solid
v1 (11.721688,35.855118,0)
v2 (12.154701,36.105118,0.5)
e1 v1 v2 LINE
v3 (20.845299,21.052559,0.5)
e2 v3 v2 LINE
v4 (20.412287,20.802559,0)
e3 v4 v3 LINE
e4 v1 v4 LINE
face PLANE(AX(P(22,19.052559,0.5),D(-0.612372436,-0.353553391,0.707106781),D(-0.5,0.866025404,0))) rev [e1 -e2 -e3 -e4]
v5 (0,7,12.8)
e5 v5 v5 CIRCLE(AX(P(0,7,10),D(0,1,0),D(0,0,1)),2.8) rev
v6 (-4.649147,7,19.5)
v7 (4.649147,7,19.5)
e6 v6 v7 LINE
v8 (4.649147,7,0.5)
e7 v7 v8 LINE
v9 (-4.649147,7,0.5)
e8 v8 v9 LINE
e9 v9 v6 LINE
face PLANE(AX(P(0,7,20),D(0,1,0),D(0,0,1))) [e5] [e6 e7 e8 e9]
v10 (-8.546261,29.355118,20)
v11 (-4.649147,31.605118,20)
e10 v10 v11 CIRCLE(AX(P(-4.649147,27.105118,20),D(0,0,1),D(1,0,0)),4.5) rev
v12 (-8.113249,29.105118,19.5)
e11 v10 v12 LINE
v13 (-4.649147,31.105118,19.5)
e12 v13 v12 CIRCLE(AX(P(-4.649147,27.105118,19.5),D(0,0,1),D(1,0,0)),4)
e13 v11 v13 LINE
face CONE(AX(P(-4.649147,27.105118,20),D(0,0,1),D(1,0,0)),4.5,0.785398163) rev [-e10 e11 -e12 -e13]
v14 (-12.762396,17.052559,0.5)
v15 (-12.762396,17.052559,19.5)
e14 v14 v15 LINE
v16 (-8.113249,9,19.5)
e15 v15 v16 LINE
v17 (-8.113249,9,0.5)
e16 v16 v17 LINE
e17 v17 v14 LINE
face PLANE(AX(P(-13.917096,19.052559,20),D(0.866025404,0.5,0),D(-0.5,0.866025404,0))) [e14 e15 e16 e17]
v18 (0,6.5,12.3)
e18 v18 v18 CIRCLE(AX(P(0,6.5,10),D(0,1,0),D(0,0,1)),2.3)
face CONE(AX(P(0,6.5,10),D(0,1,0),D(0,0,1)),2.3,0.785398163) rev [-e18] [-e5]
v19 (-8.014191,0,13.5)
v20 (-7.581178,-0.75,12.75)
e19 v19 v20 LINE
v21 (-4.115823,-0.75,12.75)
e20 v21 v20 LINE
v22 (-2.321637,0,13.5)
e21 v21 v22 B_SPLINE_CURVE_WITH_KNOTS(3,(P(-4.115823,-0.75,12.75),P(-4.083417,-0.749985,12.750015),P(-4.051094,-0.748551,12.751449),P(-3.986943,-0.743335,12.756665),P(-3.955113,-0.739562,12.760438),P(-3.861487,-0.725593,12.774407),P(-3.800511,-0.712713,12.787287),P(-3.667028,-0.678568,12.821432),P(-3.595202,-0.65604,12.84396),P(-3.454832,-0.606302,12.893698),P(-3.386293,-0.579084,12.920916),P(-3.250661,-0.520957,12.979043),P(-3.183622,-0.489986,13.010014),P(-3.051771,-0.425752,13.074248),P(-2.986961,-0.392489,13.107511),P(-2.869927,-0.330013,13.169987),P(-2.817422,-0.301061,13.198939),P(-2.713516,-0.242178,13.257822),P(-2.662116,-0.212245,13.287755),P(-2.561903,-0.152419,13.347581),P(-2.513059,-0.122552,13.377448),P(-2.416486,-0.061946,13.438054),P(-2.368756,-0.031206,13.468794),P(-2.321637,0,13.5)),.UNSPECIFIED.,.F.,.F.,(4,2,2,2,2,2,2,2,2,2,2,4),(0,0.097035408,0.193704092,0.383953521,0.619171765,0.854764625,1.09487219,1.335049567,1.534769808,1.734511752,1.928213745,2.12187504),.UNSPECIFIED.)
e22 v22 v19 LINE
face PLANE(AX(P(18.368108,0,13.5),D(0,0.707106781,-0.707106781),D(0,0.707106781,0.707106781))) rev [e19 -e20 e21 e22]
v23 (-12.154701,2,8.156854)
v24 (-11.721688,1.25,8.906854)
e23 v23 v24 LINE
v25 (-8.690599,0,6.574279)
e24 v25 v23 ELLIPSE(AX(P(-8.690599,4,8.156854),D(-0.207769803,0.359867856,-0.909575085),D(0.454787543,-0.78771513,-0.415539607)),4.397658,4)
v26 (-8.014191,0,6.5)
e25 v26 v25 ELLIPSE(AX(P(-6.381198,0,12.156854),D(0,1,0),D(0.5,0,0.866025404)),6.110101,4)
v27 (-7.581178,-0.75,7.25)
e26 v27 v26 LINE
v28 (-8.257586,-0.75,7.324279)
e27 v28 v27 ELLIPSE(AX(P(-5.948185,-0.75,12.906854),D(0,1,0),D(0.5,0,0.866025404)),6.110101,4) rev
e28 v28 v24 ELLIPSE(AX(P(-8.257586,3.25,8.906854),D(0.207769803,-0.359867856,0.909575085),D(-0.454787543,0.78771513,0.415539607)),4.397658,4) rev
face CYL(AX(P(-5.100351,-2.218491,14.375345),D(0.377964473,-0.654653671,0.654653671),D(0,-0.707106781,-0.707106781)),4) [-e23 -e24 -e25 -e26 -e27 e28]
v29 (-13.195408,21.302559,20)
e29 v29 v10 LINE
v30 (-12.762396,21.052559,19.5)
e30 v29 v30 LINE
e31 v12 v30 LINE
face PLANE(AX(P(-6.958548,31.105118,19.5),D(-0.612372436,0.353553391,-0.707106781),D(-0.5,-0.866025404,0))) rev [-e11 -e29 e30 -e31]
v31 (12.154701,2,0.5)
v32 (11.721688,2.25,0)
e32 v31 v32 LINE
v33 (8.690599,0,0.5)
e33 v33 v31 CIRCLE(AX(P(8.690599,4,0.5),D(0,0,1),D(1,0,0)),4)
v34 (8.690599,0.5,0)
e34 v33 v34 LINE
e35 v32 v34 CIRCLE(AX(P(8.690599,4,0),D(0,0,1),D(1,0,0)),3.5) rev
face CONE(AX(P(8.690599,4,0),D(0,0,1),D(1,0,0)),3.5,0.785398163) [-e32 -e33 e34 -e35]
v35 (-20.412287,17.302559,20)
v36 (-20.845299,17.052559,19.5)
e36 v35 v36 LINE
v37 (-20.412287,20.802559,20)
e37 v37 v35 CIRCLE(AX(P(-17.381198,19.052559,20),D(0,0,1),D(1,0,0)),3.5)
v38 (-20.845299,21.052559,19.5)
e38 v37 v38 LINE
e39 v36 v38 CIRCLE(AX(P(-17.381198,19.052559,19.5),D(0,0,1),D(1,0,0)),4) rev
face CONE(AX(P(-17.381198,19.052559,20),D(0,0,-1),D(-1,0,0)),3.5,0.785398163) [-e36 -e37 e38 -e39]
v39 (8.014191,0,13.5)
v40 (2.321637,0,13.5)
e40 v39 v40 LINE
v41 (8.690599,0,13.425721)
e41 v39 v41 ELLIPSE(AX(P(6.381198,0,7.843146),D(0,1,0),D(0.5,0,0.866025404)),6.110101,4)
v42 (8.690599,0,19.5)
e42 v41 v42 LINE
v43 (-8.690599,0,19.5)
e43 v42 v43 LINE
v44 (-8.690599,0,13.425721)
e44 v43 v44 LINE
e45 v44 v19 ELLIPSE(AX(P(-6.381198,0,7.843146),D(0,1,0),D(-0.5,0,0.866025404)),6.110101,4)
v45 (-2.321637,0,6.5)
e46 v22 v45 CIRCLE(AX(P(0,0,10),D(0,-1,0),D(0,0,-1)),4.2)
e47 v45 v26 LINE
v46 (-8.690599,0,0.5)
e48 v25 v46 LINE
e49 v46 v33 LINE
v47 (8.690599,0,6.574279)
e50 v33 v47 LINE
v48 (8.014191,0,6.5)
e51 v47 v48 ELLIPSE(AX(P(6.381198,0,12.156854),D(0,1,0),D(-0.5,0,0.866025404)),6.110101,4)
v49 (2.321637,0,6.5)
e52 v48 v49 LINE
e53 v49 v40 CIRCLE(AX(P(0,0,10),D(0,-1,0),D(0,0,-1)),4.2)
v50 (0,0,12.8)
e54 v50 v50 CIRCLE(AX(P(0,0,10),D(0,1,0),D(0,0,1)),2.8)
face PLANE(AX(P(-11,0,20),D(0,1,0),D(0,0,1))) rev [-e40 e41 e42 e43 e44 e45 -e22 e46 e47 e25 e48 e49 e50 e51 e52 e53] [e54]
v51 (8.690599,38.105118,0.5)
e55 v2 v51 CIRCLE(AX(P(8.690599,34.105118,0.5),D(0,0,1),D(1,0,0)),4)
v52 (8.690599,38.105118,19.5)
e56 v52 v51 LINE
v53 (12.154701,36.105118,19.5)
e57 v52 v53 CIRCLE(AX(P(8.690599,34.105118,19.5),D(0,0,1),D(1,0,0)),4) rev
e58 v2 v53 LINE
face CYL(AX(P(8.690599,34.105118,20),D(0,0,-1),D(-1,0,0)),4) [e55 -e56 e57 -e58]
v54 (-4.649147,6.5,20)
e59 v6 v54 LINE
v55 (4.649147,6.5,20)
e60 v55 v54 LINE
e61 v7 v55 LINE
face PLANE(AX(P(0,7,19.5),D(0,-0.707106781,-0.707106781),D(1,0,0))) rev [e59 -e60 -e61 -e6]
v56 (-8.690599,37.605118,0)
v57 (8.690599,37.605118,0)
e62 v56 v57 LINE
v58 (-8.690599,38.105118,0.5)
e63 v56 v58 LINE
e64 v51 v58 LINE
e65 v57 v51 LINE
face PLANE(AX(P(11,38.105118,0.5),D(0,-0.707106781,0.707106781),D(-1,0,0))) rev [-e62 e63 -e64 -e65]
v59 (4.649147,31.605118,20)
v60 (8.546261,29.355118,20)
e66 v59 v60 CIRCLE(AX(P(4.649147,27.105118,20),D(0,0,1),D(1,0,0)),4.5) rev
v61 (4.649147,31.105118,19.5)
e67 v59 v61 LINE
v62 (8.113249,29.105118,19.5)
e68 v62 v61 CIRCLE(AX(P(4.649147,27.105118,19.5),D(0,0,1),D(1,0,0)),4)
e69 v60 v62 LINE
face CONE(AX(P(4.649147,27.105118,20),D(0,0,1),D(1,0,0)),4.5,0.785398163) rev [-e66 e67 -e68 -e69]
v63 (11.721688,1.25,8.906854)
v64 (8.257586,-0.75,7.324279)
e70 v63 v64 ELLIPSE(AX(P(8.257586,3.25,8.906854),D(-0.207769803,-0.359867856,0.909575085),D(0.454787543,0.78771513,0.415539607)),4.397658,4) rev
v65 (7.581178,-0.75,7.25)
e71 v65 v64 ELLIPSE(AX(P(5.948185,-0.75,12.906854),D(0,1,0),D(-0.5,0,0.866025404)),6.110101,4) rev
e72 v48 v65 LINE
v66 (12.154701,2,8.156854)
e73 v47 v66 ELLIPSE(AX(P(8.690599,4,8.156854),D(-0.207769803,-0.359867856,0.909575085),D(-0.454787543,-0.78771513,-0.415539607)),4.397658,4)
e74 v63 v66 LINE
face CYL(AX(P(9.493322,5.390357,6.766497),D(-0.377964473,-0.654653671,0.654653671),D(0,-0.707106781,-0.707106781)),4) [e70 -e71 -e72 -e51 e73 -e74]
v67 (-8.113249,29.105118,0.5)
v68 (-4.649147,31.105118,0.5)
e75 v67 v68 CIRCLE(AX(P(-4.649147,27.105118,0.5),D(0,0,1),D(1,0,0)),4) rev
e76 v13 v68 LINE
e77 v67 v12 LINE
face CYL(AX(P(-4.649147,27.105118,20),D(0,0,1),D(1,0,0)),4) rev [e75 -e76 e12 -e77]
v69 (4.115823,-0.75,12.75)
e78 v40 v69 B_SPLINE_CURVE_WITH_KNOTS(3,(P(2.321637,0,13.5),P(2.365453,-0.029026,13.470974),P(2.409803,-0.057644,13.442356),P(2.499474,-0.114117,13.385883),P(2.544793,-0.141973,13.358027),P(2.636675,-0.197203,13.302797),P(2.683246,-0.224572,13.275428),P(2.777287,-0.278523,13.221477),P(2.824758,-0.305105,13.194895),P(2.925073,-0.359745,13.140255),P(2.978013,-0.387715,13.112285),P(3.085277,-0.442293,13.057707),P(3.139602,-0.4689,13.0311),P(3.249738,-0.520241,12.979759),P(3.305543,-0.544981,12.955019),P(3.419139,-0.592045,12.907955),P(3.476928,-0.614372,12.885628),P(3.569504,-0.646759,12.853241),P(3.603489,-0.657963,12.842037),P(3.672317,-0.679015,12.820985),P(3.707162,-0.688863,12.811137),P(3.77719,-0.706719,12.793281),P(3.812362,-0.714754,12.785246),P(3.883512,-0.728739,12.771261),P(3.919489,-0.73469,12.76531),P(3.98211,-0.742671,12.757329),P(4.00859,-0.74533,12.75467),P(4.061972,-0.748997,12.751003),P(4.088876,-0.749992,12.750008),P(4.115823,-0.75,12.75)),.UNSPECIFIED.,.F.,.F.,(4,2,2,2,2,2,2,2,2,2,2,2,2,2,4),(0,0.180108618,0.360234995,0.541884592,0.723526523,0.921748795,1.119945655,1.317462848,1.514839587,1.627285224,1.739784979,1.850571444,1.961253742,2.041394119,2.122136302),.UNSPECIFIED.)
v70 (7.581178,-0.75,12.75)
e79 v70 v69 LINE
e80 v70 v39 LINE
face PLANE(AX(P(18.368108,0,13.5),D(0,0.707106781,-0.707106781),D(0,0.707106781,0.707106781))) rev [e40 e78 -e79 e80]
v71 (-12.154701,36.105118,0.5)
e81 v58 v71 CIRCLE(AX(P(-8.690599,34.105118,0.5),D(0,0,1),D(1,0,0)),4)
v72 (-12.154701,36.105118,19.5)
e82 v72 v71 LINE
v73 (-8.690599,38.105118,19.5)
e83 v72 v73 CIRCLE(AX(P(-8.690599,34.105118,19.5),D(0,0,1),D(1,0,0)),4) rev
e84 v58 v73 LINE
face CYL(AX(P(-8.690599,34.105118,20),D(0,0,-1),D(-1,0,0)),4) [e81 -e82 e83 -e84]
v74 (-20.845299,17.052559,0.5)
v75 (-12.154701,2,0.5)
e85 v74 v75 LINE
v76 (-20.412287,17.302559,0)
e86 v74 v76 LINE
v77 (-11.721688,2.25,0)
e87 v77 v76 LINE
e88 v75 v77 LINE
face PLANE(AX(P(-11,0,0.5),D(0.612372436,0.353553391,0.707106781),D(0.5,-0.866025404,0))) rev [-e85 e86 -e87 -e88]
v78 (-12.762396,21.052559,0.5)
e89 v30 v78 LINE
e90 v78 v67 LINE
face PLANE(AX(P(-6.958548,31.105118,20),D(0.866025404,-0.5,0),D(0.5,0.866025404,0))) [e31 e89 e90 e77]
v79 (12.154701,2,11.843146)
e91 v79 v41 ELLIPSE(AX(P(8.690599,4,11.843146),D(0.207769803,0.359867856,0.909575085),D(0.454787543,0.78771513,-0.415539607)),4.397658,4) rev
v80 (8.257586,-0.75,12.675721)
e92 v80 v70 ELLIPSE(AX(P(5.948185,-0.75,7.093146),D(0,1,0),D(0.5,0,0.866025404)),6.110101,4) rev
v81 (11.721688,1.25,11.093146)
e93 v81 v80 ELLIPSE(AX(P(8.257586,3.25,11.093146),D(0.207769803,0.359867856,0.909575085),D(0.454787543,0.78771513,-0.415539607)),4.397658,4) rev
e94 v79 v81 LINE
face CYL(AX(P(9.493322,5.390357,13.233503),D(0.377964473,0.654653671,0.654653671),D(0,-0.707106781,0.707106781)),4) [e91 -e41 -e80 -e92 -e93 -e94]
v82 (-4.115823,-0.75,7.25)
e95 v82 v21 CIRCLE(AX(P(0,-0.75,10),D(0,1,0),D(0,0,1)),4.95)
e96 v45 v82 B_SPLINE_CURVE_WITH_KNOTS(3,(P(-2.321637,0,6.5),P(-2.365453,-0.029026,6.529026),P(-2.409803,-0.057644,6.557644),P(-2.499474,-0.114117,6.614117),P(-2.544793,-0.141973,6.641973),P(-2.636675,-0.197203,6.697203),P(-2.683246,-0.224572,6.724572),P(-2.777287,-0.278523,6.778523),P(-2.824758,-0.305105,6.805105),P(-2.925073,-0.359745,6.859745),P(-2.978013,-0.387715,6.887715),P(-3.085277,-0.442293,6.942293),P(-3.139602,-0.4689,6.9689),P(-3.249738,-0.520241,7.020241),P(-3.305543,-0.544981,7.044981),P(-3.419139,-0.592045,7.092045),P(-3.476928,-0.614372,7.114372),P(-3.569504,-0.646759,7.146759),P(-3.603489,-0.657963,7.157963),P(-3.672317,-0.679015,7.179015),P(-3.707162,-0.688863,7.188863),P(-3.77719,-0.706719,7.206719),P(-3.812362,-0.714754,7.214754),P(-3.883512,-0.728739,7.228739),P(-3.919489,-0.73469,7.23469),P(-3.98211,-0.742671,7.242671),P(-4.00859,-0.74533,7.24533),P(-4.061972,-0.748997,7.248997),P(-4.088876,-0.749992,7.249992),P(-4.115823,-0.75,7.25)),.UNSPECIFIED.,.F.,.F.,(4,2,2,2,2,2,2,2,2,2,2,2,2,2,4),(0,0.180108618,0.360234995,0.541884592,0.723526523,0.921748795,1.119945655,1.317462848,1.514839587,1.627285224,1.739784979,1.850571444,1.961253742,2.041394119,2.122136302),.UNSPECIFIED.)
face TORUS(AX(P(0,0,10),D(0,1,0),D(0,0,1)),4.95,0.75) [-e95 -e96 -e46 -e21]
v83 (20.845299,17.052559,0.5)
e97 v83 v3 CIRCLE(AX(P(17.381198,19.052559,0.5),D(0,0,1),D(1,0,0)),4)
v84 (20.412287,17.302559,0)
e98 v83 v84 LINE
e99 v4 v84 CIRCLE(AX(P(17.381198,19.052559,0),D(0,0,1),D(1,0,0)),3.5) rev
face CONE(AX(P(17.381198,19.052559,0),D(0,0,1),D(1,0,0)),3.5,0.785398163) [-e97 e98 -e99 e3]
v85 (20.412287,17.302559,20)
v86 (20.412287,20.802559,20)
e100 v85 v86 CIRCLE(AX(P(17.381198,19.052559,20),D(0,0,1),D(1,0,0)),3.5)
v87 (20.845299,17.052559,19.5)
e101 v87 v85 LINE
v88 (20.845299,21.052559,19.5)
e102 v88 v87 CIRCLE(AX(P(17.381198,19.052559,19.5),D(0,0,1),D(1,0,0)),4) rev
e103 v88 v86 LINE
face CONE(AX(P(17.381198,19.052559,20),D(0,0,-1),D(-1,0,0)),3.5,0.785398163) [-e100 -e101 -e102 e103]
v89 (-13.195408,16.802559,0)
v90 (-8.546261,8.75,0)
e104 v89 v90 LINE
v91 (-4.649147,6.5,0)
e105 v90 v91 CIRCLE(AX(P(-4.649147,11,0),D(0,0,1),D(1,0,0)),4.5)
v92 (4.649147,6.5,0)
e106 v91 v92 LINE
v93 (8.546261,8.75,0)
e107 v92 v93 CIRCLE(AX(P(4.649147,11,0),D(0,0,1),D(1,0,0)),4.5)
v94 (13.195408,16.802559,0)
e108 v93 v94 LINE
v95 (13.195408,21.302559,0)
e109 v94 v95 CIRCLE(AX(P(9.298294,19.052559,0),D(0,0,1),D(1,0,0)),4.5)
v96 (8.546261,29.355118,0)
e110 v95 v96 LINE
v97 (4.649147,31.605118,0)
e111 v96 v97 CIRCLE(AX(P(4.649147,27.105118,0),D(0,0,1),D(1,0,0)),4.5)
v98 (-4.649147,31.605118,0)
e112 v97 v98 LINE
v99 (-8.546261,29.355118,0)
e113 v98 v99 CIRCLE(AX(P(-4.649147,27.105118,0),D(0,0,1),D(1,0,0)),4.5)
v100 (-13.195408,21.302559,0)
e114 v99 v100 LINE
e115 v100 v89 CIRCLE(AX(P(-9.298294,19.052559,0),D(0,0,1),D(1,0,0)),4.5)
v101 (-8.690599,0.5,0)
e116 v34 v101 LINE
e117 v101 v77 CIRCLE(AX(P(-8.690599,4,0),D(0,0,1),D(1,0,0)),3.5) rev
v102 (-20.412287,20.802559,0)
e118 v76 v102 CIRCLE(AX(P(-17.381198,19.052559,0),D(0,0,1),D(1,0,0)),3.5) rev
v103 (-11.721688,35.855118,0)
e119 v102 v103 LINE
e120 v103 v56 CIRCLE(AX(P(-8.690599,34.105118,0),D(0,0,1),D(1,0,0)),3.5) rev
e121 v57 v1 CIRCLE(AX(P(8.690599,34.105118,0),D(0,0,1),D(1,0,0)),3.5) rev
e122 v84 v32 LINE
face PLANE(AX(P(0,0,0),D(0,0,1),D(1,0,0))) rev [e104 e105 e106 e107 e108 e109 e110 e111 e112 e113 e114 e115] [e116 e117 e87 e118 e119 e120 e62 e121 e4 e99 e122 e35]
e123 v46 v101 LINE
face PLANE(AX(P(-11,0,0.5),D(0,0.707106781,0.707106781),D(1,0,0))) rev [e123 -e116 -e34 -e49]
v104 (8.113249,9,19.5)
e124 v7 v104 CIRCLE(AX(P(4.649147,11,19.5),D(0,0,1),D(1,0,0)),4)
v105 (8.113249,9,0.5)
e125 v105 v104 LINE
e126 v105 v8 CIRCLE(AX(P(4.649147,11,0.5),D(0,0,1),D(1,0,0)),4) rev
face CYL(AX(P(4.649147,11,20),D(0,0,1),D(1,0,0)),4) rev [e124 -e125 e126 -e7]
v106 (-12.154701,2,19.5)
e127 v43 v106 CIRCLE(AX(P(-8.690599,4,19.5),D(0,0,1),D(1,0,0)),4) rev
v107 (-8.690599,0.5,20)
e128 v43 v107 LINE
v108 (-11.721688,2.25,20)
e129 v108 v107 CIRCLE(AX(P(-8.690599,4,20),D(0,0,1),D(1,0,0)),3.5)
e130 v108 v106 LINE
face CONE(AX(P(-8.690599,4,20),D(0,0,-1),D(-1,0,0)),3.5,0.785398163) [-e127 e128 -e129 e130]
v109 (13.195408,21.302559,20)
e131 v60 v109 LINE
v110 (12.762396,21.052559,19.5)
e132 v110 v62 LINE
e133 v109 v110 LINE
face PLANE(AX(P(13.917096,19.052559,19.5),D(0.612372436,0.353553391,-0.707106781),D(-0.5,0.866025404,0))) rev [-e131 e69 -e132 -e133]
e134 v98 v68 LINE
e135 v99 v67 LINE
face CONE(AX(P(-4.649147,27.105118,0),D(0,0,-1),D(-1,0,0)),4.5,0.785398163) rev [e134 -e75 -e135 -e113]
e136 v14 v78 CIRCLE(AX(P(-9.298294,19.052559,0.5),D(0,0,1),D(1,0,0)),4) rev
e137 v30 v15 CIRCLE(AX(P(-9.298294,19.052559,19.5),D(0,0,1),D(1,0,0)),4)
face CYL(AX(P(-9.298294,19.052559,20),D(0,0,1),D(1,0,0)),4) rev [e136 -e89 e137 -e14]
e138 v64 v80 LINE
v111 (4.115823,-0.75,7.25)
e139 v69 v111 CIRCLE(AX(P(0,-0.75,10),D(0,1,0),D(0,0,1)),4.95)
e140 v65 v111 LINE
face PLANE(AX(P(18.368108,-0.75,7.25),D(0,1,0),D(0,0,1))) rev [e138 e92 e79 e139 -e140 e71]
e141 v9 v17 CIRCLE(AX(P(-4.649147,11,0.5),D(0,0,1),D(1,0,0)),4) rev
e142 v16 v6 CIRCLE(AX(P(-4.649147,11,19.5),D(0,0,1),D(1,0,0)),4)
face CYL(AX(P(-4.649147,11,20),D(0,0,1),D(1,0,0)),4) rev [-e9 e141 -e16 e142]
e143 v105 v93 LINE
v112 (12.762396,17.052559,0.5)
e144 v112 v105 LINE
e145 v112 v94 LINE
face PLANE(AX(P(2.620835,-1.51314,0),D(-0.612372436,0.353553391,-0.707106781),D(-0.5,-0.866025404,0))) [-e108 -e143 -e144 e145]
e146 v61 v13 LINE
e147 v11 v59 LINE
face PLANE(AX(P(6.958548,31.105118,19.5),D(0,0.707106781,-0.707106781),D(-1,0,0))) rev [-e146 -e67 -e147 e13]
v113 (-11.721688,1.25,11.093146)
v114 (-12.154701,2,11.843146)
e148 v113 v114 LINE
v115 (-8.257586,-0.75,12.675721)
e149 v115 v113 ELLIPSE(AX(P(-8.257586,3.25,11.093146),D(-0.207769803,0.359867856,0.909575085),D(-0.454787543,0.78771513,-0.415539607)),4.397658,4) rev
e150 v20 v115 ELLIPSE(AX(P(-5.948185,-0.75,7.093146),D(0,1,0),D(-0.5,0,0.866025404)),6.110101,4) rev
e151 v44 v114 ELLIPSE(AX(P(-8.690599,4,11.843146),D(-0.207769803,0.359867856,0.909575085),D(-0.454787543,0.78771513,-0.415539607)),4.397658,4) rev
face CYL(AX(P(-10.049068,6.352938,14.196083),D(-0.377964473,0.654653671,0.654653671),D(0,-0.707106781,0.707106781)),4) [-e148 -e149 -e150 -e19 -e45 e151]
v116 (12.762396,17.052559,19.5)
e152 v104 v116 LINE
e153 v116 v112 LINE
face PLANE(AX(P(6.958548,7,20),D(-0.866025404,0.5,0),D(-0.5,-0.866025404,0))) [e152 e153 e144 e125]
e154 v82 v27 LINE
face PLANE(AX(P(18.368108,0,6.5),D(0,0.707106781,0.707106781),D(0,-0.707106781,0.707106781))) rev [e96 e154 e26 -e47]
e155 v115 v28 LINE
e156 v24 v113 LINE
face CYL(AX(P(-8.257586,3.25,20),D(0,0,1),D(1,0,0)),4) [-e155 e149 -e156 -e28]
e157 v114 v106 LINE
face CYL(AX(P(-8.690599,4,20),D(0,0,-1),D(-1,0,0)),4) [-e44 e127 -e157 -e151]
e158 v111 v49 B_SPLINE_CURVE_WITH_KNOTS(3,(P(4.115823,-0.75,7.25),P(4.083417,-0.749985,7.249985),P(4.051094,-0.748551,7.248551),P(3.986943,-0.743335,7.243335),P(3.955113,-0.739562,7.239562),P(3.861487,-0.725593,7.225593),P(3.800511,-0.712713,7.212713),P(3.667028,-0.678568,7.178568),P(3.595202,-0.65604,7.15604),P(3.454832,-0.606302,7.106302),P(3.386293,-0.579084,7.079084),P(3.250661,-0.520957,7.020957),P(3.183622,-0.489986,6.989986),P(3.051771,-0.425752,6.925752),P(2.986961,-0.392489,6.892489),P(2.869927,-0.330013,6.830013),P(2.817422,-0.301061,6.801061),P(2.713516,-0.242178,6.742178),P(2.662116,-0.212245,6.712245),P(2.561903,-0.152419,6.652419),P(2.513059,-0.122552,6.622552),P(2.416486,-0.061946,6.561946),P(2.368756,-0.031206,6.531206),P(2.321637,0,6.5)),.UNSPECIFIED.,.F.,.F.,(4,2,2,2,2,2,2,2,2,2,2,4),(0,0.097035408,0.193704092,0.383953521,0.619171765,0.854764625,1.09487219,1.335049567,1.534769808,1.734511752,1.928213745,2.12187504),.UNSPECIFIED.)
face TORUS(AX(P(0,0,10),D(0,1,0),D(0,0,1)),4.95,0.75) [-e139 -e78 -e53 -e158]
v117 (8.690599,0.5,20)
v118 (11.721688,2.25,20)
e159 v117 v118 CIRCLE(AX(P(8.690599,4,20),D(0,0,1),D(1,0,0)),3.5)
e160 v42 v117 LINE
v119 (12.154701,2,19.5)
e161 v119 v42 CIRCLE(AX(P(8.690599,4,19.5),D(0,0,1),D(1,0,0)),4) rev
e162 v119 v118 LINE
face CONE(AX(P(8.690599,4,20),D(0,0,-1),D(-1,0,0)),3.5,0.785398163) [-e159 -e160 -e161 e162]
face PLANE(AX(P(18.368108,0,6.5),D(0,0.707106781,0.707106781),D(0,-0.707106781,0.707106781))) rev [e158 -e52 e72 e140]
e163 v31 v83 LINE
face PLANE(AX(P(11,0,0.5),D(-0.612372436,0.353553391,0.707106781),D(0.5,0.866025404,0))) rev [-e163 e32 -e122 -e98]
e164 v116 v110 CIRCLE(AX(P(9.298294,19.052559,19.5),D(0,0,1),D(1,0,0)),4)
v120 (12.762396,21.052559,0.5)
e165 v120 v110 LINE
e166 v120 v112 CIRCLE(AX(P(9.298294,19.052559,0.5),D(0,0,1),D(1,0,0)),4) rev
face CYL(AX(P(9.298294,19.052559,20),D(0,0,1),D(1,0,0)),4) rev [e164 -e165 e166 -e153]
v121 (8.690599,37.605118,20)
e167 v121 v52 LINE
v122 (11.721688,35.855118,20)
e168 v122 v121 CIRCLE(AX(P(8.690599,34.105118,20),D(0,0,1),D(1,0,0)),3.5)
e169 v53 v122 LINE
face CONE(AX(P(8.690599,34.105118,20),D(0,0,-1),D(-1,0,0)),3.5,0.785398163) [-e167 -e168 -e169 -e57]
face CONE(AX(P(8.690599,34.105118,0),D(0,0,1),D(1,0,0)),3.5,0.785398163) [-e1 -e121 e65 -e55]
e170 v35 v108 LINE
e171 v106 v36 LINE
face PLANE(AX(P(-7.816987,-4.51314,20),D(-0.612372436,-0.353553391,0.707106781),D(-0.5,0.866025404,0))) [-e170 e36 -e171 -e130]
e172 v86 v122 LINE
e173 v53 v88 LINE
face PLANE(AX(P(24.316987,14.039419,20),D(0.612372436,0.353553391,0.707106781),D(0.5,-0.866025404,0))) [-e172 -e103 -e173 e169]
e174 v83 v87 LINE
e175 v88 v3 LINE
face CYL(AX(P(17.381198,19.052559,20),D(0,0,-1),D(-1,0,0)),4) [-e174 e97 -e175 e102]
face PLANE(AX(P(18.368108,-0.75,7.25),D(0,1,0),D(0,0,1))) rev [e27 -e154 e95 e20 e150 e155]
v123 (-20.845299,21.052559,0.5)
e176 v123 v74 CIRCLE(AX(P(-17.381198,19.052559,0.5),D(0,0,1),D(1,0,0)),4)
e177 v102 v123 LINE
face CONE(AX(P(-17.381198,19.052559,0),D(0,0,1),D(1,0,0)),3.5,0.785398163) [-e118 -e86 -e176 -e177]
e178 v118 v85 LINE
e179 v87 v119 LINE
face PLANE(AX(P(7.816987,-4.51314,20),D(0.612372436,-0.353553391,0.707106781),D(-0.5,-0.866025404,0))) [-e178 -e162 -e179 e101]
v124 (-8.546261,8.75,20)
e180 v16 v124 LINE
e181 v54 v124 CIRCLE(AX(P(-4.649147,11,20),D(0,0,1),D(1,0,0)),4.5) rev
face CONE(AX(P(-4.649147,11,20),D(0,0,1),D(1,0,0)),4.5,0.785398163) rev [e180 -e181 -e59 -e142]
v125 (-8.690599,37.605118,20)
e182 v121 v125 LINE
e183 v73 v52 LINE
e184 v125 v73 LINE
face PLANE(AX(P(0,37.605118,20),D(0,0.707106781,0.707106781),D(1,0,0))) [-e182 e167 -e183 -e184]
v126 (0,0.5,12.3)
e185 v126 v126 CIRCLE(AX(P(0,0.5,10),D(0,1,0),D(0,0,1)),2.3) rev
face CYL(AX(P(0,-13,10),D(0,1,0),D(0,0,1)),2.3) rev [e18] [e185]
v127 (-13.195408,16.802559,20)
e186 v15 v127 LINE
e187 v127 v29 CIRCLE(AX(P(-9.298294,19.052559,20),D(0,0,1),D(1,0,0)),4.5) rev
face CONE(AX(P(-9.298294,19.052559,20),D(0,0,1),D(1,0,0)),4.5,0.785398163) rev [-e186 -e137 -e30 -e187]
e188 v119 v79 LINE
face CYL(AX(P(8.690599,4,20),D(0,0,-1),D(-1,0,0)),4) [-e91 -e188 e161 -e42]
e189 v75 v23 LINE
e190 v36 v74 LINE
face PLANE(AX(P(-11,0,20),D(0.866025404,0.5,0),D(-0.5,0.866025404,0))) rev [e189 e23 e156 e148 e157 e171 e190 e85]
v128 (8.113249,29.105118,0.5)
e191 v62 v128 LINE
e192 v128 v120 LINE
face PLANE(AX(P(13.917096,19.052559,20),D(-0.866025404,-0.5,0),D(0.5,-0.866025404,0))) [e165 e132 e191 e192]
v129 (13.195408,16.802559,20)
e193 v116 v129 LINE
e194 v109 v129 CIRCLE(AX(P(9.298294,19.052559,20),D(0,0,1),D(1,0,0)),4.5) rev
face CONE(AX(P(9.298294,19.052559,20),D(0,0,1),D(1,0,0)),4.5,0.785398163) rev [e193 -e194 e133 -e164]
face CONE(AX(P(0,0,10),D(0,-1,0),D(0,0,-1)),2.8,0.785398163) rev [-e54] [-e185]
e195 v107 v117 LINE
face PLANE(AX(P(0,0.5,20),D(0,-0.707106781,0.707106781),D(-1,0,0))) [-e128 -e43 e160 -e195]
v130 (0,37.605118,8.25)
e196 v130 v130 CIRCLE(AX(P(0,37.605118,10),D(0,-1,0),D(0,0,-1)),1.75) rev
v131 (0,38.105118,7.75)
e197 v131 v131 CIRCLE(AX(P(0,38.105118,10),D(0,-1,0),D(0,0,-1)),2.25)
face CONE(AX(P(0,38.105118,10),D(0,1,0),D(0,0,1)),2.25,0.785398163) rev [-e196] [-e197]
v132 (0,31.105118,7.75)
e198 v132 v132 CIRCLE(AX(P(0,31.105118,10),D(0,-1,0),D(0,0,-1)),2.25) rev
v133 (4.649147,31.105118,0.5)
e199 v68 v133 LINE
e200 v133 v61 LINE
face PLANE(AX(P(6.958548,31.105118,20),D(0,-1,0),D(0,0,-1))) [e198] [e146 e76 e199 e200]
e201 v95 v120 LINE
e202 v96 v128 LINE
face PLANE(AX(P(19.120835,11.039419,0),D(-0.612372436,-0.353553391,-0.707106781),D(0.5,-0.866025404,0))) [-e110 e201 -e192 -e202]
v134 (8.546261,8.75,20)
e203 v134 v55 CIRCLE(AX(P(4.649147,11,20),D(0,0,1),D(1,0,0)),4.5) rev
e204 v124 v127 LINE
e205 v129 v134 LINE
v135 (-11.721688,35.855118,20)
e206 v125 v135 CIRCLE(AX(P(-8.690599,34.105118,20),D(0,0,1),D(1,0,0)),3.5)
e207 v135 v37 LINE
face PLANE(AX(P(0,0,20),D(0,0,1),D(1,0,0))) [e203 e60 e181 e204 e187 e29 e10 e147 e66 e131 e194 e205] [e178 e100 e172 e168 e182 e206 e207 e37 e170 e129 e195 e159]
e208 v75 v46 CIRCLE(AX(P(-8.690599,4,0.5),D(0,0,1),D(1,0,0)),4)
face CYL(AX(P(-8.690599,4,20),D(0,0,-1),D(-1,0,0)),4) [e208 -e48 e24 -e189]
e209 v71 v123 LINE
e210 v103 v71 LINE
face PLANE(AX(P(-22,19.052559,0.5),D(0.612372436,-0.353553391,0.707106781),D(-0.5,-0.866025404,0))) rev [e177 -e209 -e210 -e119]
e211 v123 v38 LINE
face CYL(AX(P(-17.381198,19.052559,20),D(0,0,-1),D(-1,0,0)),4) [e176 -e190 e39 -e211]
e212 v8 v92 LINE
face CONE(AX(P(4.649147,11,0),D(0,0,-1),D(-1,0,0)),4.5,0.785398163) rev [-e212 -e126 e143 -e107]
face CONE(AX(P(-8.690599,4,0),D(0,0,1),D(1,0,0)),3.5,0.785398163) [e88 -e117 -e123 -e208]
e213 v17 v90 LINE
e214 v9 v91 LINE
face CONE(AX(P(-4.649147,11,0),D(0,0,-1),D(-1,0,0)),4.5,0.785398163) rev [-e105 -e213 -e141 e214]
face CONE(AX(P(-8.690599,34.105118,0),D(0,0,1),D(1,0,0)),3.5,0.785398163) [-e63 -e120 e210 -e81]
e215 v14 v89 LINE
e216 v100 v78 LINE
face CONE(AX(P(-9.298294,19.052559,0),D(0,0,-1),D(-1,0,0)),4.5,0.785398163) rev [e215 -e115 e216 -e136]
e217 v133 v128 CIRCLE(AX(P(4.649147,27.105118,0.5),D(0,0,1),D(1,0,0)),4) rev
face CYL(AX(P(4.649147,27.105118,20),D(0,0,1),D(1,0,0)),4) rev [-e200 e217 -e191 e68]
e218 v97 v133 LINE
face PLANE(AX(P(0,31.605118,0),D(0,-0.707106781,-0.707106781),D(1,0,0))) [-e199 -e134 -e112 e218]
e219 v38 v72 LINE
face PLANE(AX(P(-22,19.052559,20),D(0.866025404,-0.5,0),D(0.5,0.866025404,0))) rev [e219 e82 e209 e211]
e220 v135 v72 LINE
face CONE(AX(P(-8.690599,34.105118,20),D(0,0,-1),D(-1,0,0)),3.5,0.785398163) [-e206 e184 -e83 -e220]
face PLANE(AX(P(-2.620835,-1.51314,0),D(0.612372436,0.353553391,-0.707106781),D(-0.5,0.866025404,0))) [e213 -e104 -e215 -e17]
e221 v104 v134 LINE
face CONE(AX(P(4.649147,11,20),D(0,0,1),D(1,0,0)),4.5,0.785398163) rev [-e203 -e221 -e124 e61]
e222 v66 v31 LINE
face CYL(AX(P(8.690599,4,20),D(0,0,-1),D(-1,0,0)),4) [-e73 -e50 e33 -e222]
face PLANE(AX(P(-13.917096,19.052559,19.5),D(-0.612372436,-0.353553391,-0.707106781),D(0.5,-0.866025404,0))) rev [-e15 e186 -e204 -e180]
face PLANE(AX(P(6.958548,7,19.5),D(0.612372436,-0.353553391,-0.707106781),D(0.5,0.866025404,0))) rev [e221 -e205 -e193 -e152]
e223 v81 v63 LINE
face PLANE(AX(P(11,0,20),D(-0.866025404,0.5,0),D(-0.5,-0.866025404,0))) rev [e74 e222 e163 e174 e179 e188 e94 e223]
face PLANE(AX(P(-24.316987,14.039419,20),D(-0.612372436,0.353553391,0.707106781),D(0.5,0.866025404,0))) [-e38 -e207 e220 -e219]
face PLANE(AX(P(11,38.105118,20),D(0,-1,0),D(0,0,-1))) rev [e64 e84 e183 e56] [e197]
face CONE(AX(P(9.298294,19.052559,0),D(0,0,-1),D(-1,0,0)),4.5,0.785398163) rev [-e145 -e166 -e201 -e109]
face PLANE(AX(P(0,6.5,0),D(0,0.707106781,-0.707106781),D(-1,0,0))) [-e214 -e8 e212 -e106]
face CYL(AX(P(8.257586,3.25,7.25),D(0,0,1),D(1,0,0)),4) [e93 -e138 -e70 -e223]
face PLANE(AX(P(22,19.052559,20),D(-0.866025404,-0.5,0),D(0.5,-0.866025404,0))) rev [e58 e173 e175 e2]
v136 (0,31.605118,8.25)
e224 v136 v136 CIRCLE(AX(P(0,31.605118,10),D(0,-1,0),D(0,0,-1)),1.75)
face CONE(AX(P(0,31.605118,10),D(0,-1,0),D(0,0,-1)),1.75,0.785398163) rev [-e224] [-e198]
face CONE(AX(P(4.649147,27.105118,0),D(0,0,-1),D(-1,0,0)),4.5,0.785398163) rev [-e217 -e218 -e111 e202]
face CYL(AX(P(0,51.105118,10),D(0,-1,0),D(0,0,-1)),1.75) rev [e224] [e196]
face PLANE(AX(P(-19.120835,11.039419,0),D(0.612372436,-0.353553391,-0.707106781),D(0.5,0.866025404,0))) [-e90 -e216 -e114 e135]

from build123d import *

# Parameters (mm, degrees)
AUFSATZ_LINEAR_AUSTRAGEN1_DEPTH             = 20
AUFSATZ_LINEAR_AUSTRAGEN2_REACH             = 50.332
AUFSATZ_LINEAR_AUSTRAGEN2_DIRECTION_2_REACH = 50.332
SKIZZE2_R                                   = 2.3
SCHNITT_LINEAR_AUSTRAGEN1_DEPTH             = 20
SKIZZE4_R                                   = 4.2
SCHNITT_LINEAR_AUSTRAGEN2_DEPTH             = 20
VERRUNDUNG1_R                               = 0.75
VERRUNDUNG2_R                               = 4
SKIZZE5_R                                   = 1.7499999999999998
SCHNITT_LINEAR_AUSTRAGEN3_DEPTH             = 20
FASE1_SIZE                                  = 0.5


with BuildPart() as part:
    # Skizze1 → Aufsatz-Linear austragen1 (new body)
    with BuildSketch(Plane.XY):
        Polygon((-11, 0), (11, 0), (21.999999999999947, 19.052558883257674), (10.999999999999858, 38.10511776651528), (-10.999999999999858, 38.10511776651528), (-21.999999999999947, 19.052558883257674), align=None)
        Polygon((0, 7), (6.958548115672608, 7), (13.917096231345187, 19.052558883257657), (6.958548115672503, 31.105117766515278), (-6.958548115672498, 31.105117766515278), (-13.917096231345184, 19.05255888325765), (-6.958548115672604, 7), align=None, mode=Mode.SUBTRACT)
    extrude(amount=AUFSATZ_LINEAR_AUSTRAGEN1_DEPTH)

    # Aufsatz-Linear austragen2: up to this plane
    aufsatz_linear_austragen2_end = Plane(origin=(11, 0, 20), z_dir=(-0.86602540378444, 0.4999999999999978, 0))
    # Skizze3 → Aufsatz-Linear austragen2 (add, up to the surface)
    with BuildSketch(Plane(origin=(0, 0, 0), x_dir=(0, 0, -1), z_dir=(1, 0, 0)), mode=Mode.PRIVATE) as aufsatz_linear_austragen2_sk1:
        Polygon((-13.5, 8.3e-16), (-6.500000000000001, 8.3e-16), (-7.250000000000007, -0.7499999999999989), (-12.749999999999995, -0.7499999999999989), align=None)
    aufsatz_linear_austragen2_tool1 = split(extrude(aufsatz_linear_austragen2_sk1.sketch, amount=AUFSATZ_LINEAR_AUSTRAGEN2_REACH, mode=Mode.PRIVATE), bisect_by=aufsatz_linear_austragen2_end, keep=Keep.BOTH, mode=Mode.PRIVATE)
    add(aufsatz_linear_austragen2_tool1.solids().sort_by_distance((0, -0.36, 10))[0])

    # Aufsatz-Linear austragen2 direction 2: up to this plane
    aufsatz_linear_austragen2_direction_2_end = Plane(origin=(-11, 0, 20), z_dir=(0.86602540378444, 0.4999999999999978, 0))
    # Skizze3 → Aufsatz-Linear austragen2 direction 2 (add, up to the surface)
    with BuildSketch(Plane(origin=(0, 0, 0), x_dir=(0, 0, -1), z_dir=(1, 0, 0)), mode=Mode.PRIVATE) as aufsatz_linear_austragen2_direction_2_sk1:
        Polygon((-13.5, 8.3e-16), (-6.500000000000001, 8.3e-16), (-7.250000000000007, -0.7499999999999989), (-12.749999999999995, -0.7499999999999989), align=None)
    aufsatz_linear_austragen2_direction_2_tool1 = split(extrude(aufsatz_linear_austragen2_direction_2_sk1.sketch, amount=-AUFSATZ_LINEAR_AUSTRAGEN2_DIRECTION_2_REACH, mode=Mode.PRIVATE), bisect_by=aufsatz_linear_austragen2_direction_2_end, keep=Keep.BOTH, mode=Mode.PRIVATE)
    add(aufsatz_linear_austragen2_direction_2_tool1.solids().sort_by_distance((0, -0.36, 10))[0])

    # Skizze2 → Schnitt-Linear austragen1 (cut)
    with BuildSketch(Plane(origin=(0, 7, 0), x_dir=(1, 0, 0), z_dir=(0, 1, 0))):
        with Locations(Location((6.94e-15, -10, 0), (0, 0, 270))):
            Circle(SKIZZE2_R)
    extrude(amount=-SCHNITT_LINEAR_AUSTRAGEN1_DEPTH, mode=Mode.SUBTRACT)

    # Skizze4 → Schnitt-Linear austragen2 (cut)
    with BuildSketch(Plane.XZ):
        with Locations((6.94e-15, 10)):
            Circle(SKIZZE4_R)
    extrude(amount=SCHNITT_LINEAR_AUSTRAGEN2_DEPTH, mode=Mode.SUBTRACT)

    # Verrundung1
    verrundung1_edges = [part.edges().sort_by_distance(p)[0] for p in [
        (-4.199999999999993, -0.7499999999999989, 10),
        (4.200000000000008, -0.7499999999999989, 10),
    ]]
    fillet(verrundung1_edges, radius=VERRUNDUNG1_R - 0.0001)  # a hair under: the kernel refuses the full size

    # Verrundung2
    verrundung2_edges = [part.edges().sort_by_distance(p)[0] for p in [
        (11, 0, 16.75),
        (-11, 0, 16.75),
        (-21.999999999999947, 19.052558883257674, 10),
        (-10.999999999999858, 38.10511776651528, 10),
        (10.999999999999858, 38.10511776651528, 10),
        (21.999999999999947, 19.052558883257674, 10),
        (-6.958548115672604, 7, 10),
        (6.958548115672608, 7, 10),
        (13.917096231345187, 19.052558883257657, 10),
        (6.958548115672503, 31.105117766515278, 10),
        (-6.958548115672498, 31.105117766515278, 10),
        (-13.917096231345184, 19.05255888325765, 10),
        (11, 0, 3.2500000000000004),
        (-11, 0, 3.2500000000000004),
        (10.783493649053893, -0.3750000000000009, 6.875000000000002),
        (10.566987298107785, -0.749999999999999, 10),
        (10.783493649053893, -0.37499999999999845, 13.124999999999996),
        (-10.783493649053893, -0.37499999999999845, 13.124999999999996),
        (-10.783493649053893, -0.3750000000000009, 6.875000000000002),
        (-10.566987298107785, -0.749999999999999, 10),
    ]]
    fillet(verrundung2_edges, radius=VERRUNDUNG2_R)

    # Skizze5 → Schnitt-Linear austragen3 (cut)
    with BuildSketch(Plane.XZ.offset(-31.105117766515278)):
        with Locations(Location((6.94e-15, 10, 0), (0, 0, 270))):
            Circle(SKIZZE5_R)
    extrude(amount=-SCHNITT_LINEAR_AUSTRAGEN3_DEPTH, mode=Mode.SUBTRACT)

    # Fase1
    fase1_edges = [part.edges().sort_by_distance(p)[0] for p in [
        (-10.437822173508891, 13.026279441628823, 0),
        (-21.38119784648294, 19.052558883257667, 0),
        (-10.69059892324136, 37.569219381653035, 0),
        (10.69059892324136, 37.569219381653035, 0),
        (21.38119784648294, 19.052558883257674, 0),
        (-10.690598923241494, 0.5358983848622438, 0),
        (10.690598923241497, 0.5358983848622478, 0),
        (1.78e-15, 0, 20),
        (16.4999999999999, 28.578838324886483, 20),
        (0, 38.10511776651528, 20),
        (-16.4999999999999, 28.57883832488648, 20),
        (-16.49999999999997, 9.526279441628835, 20),
        (10.437822173508899, 13.02627944162883, 20),
        (8.9e-16, 7, 20),
        (-10.437822173508891, 13.026279441628823, 20),
        (-10.437822173508836, 25.078838324886473, 20),
        (2.66e-15, 31.105117766515278, 20),
        (10.437822173508838, 25.078838324886476, 20),
        (-21.38119784648294, 19.052558883257667, 20),
        (-10.69059892324136, 37.569219381653035, 20),
        (10.69059892324136, 37.569219381653035, 20),
        (21.38119784648294, 19.052558883257674, 20),
        (-10.690598923241494, 0.5358983848622438, 20),
        (10.690598923241497, 0.5358983848622478, 20),
        (13.298294077828178, 19.05255888325766, 0),
        (13.298294077828178, 19.05255888325766, 20),
        (6.649147038914101, 7.535898384862248, 0),
        (6.649147038914101, 7.535898384862248, 20),
        (-6.6491470389141, 7.5358983848622465, 0),
        (-6.6491470389141, 7.5358983848622465, 20),
        (-13.298294077828174, 19.052558883257642, 0),
        (-13.298294077828174, 19.052558883257642, 20),
        (-6.649147038914, 30.56921938165304, 0),
        (-6.649147038914, 30.56921938165304, 20),
        (6.649147038914005, 30.56921938165304, 0),
        (6.649147038914005, 30.56921938165304, 20),
        (7.47e-15, 38.10511776651528, 11.75),
        (7.47e-15, 31.105117766515278, 11.75),
        (7.64e-15, 7, 7.7),
        (7.64e-15, 0, 7.7),
        (16.499999999999975, 9.526279441628839, 0),
        (16.499999999999975, 9.526279441628839, 20),
        (1.78e-15, 0, 0),
        (-16.49999999999997, 9.526279441628835, 0),
        (-16.4999999999999, 28.57883832488648, 0),
        (0, 38.10511776651528, 0),
        (16.4999999999999, 28.578838324886483, 0),
        (0, 7, 0),
        (10.437822173508899, 13.02627944162883, 0),
        (10.437822173508838, 25.078838324886476, 0),
        (2.66e-15, 31.105117766515278, 0),
        (-10.437822173508836, 25.078838324886473, 0),
    ]]
    chamfer(fase1_edges, length=FASE1_SIZE)


solid = part.part
